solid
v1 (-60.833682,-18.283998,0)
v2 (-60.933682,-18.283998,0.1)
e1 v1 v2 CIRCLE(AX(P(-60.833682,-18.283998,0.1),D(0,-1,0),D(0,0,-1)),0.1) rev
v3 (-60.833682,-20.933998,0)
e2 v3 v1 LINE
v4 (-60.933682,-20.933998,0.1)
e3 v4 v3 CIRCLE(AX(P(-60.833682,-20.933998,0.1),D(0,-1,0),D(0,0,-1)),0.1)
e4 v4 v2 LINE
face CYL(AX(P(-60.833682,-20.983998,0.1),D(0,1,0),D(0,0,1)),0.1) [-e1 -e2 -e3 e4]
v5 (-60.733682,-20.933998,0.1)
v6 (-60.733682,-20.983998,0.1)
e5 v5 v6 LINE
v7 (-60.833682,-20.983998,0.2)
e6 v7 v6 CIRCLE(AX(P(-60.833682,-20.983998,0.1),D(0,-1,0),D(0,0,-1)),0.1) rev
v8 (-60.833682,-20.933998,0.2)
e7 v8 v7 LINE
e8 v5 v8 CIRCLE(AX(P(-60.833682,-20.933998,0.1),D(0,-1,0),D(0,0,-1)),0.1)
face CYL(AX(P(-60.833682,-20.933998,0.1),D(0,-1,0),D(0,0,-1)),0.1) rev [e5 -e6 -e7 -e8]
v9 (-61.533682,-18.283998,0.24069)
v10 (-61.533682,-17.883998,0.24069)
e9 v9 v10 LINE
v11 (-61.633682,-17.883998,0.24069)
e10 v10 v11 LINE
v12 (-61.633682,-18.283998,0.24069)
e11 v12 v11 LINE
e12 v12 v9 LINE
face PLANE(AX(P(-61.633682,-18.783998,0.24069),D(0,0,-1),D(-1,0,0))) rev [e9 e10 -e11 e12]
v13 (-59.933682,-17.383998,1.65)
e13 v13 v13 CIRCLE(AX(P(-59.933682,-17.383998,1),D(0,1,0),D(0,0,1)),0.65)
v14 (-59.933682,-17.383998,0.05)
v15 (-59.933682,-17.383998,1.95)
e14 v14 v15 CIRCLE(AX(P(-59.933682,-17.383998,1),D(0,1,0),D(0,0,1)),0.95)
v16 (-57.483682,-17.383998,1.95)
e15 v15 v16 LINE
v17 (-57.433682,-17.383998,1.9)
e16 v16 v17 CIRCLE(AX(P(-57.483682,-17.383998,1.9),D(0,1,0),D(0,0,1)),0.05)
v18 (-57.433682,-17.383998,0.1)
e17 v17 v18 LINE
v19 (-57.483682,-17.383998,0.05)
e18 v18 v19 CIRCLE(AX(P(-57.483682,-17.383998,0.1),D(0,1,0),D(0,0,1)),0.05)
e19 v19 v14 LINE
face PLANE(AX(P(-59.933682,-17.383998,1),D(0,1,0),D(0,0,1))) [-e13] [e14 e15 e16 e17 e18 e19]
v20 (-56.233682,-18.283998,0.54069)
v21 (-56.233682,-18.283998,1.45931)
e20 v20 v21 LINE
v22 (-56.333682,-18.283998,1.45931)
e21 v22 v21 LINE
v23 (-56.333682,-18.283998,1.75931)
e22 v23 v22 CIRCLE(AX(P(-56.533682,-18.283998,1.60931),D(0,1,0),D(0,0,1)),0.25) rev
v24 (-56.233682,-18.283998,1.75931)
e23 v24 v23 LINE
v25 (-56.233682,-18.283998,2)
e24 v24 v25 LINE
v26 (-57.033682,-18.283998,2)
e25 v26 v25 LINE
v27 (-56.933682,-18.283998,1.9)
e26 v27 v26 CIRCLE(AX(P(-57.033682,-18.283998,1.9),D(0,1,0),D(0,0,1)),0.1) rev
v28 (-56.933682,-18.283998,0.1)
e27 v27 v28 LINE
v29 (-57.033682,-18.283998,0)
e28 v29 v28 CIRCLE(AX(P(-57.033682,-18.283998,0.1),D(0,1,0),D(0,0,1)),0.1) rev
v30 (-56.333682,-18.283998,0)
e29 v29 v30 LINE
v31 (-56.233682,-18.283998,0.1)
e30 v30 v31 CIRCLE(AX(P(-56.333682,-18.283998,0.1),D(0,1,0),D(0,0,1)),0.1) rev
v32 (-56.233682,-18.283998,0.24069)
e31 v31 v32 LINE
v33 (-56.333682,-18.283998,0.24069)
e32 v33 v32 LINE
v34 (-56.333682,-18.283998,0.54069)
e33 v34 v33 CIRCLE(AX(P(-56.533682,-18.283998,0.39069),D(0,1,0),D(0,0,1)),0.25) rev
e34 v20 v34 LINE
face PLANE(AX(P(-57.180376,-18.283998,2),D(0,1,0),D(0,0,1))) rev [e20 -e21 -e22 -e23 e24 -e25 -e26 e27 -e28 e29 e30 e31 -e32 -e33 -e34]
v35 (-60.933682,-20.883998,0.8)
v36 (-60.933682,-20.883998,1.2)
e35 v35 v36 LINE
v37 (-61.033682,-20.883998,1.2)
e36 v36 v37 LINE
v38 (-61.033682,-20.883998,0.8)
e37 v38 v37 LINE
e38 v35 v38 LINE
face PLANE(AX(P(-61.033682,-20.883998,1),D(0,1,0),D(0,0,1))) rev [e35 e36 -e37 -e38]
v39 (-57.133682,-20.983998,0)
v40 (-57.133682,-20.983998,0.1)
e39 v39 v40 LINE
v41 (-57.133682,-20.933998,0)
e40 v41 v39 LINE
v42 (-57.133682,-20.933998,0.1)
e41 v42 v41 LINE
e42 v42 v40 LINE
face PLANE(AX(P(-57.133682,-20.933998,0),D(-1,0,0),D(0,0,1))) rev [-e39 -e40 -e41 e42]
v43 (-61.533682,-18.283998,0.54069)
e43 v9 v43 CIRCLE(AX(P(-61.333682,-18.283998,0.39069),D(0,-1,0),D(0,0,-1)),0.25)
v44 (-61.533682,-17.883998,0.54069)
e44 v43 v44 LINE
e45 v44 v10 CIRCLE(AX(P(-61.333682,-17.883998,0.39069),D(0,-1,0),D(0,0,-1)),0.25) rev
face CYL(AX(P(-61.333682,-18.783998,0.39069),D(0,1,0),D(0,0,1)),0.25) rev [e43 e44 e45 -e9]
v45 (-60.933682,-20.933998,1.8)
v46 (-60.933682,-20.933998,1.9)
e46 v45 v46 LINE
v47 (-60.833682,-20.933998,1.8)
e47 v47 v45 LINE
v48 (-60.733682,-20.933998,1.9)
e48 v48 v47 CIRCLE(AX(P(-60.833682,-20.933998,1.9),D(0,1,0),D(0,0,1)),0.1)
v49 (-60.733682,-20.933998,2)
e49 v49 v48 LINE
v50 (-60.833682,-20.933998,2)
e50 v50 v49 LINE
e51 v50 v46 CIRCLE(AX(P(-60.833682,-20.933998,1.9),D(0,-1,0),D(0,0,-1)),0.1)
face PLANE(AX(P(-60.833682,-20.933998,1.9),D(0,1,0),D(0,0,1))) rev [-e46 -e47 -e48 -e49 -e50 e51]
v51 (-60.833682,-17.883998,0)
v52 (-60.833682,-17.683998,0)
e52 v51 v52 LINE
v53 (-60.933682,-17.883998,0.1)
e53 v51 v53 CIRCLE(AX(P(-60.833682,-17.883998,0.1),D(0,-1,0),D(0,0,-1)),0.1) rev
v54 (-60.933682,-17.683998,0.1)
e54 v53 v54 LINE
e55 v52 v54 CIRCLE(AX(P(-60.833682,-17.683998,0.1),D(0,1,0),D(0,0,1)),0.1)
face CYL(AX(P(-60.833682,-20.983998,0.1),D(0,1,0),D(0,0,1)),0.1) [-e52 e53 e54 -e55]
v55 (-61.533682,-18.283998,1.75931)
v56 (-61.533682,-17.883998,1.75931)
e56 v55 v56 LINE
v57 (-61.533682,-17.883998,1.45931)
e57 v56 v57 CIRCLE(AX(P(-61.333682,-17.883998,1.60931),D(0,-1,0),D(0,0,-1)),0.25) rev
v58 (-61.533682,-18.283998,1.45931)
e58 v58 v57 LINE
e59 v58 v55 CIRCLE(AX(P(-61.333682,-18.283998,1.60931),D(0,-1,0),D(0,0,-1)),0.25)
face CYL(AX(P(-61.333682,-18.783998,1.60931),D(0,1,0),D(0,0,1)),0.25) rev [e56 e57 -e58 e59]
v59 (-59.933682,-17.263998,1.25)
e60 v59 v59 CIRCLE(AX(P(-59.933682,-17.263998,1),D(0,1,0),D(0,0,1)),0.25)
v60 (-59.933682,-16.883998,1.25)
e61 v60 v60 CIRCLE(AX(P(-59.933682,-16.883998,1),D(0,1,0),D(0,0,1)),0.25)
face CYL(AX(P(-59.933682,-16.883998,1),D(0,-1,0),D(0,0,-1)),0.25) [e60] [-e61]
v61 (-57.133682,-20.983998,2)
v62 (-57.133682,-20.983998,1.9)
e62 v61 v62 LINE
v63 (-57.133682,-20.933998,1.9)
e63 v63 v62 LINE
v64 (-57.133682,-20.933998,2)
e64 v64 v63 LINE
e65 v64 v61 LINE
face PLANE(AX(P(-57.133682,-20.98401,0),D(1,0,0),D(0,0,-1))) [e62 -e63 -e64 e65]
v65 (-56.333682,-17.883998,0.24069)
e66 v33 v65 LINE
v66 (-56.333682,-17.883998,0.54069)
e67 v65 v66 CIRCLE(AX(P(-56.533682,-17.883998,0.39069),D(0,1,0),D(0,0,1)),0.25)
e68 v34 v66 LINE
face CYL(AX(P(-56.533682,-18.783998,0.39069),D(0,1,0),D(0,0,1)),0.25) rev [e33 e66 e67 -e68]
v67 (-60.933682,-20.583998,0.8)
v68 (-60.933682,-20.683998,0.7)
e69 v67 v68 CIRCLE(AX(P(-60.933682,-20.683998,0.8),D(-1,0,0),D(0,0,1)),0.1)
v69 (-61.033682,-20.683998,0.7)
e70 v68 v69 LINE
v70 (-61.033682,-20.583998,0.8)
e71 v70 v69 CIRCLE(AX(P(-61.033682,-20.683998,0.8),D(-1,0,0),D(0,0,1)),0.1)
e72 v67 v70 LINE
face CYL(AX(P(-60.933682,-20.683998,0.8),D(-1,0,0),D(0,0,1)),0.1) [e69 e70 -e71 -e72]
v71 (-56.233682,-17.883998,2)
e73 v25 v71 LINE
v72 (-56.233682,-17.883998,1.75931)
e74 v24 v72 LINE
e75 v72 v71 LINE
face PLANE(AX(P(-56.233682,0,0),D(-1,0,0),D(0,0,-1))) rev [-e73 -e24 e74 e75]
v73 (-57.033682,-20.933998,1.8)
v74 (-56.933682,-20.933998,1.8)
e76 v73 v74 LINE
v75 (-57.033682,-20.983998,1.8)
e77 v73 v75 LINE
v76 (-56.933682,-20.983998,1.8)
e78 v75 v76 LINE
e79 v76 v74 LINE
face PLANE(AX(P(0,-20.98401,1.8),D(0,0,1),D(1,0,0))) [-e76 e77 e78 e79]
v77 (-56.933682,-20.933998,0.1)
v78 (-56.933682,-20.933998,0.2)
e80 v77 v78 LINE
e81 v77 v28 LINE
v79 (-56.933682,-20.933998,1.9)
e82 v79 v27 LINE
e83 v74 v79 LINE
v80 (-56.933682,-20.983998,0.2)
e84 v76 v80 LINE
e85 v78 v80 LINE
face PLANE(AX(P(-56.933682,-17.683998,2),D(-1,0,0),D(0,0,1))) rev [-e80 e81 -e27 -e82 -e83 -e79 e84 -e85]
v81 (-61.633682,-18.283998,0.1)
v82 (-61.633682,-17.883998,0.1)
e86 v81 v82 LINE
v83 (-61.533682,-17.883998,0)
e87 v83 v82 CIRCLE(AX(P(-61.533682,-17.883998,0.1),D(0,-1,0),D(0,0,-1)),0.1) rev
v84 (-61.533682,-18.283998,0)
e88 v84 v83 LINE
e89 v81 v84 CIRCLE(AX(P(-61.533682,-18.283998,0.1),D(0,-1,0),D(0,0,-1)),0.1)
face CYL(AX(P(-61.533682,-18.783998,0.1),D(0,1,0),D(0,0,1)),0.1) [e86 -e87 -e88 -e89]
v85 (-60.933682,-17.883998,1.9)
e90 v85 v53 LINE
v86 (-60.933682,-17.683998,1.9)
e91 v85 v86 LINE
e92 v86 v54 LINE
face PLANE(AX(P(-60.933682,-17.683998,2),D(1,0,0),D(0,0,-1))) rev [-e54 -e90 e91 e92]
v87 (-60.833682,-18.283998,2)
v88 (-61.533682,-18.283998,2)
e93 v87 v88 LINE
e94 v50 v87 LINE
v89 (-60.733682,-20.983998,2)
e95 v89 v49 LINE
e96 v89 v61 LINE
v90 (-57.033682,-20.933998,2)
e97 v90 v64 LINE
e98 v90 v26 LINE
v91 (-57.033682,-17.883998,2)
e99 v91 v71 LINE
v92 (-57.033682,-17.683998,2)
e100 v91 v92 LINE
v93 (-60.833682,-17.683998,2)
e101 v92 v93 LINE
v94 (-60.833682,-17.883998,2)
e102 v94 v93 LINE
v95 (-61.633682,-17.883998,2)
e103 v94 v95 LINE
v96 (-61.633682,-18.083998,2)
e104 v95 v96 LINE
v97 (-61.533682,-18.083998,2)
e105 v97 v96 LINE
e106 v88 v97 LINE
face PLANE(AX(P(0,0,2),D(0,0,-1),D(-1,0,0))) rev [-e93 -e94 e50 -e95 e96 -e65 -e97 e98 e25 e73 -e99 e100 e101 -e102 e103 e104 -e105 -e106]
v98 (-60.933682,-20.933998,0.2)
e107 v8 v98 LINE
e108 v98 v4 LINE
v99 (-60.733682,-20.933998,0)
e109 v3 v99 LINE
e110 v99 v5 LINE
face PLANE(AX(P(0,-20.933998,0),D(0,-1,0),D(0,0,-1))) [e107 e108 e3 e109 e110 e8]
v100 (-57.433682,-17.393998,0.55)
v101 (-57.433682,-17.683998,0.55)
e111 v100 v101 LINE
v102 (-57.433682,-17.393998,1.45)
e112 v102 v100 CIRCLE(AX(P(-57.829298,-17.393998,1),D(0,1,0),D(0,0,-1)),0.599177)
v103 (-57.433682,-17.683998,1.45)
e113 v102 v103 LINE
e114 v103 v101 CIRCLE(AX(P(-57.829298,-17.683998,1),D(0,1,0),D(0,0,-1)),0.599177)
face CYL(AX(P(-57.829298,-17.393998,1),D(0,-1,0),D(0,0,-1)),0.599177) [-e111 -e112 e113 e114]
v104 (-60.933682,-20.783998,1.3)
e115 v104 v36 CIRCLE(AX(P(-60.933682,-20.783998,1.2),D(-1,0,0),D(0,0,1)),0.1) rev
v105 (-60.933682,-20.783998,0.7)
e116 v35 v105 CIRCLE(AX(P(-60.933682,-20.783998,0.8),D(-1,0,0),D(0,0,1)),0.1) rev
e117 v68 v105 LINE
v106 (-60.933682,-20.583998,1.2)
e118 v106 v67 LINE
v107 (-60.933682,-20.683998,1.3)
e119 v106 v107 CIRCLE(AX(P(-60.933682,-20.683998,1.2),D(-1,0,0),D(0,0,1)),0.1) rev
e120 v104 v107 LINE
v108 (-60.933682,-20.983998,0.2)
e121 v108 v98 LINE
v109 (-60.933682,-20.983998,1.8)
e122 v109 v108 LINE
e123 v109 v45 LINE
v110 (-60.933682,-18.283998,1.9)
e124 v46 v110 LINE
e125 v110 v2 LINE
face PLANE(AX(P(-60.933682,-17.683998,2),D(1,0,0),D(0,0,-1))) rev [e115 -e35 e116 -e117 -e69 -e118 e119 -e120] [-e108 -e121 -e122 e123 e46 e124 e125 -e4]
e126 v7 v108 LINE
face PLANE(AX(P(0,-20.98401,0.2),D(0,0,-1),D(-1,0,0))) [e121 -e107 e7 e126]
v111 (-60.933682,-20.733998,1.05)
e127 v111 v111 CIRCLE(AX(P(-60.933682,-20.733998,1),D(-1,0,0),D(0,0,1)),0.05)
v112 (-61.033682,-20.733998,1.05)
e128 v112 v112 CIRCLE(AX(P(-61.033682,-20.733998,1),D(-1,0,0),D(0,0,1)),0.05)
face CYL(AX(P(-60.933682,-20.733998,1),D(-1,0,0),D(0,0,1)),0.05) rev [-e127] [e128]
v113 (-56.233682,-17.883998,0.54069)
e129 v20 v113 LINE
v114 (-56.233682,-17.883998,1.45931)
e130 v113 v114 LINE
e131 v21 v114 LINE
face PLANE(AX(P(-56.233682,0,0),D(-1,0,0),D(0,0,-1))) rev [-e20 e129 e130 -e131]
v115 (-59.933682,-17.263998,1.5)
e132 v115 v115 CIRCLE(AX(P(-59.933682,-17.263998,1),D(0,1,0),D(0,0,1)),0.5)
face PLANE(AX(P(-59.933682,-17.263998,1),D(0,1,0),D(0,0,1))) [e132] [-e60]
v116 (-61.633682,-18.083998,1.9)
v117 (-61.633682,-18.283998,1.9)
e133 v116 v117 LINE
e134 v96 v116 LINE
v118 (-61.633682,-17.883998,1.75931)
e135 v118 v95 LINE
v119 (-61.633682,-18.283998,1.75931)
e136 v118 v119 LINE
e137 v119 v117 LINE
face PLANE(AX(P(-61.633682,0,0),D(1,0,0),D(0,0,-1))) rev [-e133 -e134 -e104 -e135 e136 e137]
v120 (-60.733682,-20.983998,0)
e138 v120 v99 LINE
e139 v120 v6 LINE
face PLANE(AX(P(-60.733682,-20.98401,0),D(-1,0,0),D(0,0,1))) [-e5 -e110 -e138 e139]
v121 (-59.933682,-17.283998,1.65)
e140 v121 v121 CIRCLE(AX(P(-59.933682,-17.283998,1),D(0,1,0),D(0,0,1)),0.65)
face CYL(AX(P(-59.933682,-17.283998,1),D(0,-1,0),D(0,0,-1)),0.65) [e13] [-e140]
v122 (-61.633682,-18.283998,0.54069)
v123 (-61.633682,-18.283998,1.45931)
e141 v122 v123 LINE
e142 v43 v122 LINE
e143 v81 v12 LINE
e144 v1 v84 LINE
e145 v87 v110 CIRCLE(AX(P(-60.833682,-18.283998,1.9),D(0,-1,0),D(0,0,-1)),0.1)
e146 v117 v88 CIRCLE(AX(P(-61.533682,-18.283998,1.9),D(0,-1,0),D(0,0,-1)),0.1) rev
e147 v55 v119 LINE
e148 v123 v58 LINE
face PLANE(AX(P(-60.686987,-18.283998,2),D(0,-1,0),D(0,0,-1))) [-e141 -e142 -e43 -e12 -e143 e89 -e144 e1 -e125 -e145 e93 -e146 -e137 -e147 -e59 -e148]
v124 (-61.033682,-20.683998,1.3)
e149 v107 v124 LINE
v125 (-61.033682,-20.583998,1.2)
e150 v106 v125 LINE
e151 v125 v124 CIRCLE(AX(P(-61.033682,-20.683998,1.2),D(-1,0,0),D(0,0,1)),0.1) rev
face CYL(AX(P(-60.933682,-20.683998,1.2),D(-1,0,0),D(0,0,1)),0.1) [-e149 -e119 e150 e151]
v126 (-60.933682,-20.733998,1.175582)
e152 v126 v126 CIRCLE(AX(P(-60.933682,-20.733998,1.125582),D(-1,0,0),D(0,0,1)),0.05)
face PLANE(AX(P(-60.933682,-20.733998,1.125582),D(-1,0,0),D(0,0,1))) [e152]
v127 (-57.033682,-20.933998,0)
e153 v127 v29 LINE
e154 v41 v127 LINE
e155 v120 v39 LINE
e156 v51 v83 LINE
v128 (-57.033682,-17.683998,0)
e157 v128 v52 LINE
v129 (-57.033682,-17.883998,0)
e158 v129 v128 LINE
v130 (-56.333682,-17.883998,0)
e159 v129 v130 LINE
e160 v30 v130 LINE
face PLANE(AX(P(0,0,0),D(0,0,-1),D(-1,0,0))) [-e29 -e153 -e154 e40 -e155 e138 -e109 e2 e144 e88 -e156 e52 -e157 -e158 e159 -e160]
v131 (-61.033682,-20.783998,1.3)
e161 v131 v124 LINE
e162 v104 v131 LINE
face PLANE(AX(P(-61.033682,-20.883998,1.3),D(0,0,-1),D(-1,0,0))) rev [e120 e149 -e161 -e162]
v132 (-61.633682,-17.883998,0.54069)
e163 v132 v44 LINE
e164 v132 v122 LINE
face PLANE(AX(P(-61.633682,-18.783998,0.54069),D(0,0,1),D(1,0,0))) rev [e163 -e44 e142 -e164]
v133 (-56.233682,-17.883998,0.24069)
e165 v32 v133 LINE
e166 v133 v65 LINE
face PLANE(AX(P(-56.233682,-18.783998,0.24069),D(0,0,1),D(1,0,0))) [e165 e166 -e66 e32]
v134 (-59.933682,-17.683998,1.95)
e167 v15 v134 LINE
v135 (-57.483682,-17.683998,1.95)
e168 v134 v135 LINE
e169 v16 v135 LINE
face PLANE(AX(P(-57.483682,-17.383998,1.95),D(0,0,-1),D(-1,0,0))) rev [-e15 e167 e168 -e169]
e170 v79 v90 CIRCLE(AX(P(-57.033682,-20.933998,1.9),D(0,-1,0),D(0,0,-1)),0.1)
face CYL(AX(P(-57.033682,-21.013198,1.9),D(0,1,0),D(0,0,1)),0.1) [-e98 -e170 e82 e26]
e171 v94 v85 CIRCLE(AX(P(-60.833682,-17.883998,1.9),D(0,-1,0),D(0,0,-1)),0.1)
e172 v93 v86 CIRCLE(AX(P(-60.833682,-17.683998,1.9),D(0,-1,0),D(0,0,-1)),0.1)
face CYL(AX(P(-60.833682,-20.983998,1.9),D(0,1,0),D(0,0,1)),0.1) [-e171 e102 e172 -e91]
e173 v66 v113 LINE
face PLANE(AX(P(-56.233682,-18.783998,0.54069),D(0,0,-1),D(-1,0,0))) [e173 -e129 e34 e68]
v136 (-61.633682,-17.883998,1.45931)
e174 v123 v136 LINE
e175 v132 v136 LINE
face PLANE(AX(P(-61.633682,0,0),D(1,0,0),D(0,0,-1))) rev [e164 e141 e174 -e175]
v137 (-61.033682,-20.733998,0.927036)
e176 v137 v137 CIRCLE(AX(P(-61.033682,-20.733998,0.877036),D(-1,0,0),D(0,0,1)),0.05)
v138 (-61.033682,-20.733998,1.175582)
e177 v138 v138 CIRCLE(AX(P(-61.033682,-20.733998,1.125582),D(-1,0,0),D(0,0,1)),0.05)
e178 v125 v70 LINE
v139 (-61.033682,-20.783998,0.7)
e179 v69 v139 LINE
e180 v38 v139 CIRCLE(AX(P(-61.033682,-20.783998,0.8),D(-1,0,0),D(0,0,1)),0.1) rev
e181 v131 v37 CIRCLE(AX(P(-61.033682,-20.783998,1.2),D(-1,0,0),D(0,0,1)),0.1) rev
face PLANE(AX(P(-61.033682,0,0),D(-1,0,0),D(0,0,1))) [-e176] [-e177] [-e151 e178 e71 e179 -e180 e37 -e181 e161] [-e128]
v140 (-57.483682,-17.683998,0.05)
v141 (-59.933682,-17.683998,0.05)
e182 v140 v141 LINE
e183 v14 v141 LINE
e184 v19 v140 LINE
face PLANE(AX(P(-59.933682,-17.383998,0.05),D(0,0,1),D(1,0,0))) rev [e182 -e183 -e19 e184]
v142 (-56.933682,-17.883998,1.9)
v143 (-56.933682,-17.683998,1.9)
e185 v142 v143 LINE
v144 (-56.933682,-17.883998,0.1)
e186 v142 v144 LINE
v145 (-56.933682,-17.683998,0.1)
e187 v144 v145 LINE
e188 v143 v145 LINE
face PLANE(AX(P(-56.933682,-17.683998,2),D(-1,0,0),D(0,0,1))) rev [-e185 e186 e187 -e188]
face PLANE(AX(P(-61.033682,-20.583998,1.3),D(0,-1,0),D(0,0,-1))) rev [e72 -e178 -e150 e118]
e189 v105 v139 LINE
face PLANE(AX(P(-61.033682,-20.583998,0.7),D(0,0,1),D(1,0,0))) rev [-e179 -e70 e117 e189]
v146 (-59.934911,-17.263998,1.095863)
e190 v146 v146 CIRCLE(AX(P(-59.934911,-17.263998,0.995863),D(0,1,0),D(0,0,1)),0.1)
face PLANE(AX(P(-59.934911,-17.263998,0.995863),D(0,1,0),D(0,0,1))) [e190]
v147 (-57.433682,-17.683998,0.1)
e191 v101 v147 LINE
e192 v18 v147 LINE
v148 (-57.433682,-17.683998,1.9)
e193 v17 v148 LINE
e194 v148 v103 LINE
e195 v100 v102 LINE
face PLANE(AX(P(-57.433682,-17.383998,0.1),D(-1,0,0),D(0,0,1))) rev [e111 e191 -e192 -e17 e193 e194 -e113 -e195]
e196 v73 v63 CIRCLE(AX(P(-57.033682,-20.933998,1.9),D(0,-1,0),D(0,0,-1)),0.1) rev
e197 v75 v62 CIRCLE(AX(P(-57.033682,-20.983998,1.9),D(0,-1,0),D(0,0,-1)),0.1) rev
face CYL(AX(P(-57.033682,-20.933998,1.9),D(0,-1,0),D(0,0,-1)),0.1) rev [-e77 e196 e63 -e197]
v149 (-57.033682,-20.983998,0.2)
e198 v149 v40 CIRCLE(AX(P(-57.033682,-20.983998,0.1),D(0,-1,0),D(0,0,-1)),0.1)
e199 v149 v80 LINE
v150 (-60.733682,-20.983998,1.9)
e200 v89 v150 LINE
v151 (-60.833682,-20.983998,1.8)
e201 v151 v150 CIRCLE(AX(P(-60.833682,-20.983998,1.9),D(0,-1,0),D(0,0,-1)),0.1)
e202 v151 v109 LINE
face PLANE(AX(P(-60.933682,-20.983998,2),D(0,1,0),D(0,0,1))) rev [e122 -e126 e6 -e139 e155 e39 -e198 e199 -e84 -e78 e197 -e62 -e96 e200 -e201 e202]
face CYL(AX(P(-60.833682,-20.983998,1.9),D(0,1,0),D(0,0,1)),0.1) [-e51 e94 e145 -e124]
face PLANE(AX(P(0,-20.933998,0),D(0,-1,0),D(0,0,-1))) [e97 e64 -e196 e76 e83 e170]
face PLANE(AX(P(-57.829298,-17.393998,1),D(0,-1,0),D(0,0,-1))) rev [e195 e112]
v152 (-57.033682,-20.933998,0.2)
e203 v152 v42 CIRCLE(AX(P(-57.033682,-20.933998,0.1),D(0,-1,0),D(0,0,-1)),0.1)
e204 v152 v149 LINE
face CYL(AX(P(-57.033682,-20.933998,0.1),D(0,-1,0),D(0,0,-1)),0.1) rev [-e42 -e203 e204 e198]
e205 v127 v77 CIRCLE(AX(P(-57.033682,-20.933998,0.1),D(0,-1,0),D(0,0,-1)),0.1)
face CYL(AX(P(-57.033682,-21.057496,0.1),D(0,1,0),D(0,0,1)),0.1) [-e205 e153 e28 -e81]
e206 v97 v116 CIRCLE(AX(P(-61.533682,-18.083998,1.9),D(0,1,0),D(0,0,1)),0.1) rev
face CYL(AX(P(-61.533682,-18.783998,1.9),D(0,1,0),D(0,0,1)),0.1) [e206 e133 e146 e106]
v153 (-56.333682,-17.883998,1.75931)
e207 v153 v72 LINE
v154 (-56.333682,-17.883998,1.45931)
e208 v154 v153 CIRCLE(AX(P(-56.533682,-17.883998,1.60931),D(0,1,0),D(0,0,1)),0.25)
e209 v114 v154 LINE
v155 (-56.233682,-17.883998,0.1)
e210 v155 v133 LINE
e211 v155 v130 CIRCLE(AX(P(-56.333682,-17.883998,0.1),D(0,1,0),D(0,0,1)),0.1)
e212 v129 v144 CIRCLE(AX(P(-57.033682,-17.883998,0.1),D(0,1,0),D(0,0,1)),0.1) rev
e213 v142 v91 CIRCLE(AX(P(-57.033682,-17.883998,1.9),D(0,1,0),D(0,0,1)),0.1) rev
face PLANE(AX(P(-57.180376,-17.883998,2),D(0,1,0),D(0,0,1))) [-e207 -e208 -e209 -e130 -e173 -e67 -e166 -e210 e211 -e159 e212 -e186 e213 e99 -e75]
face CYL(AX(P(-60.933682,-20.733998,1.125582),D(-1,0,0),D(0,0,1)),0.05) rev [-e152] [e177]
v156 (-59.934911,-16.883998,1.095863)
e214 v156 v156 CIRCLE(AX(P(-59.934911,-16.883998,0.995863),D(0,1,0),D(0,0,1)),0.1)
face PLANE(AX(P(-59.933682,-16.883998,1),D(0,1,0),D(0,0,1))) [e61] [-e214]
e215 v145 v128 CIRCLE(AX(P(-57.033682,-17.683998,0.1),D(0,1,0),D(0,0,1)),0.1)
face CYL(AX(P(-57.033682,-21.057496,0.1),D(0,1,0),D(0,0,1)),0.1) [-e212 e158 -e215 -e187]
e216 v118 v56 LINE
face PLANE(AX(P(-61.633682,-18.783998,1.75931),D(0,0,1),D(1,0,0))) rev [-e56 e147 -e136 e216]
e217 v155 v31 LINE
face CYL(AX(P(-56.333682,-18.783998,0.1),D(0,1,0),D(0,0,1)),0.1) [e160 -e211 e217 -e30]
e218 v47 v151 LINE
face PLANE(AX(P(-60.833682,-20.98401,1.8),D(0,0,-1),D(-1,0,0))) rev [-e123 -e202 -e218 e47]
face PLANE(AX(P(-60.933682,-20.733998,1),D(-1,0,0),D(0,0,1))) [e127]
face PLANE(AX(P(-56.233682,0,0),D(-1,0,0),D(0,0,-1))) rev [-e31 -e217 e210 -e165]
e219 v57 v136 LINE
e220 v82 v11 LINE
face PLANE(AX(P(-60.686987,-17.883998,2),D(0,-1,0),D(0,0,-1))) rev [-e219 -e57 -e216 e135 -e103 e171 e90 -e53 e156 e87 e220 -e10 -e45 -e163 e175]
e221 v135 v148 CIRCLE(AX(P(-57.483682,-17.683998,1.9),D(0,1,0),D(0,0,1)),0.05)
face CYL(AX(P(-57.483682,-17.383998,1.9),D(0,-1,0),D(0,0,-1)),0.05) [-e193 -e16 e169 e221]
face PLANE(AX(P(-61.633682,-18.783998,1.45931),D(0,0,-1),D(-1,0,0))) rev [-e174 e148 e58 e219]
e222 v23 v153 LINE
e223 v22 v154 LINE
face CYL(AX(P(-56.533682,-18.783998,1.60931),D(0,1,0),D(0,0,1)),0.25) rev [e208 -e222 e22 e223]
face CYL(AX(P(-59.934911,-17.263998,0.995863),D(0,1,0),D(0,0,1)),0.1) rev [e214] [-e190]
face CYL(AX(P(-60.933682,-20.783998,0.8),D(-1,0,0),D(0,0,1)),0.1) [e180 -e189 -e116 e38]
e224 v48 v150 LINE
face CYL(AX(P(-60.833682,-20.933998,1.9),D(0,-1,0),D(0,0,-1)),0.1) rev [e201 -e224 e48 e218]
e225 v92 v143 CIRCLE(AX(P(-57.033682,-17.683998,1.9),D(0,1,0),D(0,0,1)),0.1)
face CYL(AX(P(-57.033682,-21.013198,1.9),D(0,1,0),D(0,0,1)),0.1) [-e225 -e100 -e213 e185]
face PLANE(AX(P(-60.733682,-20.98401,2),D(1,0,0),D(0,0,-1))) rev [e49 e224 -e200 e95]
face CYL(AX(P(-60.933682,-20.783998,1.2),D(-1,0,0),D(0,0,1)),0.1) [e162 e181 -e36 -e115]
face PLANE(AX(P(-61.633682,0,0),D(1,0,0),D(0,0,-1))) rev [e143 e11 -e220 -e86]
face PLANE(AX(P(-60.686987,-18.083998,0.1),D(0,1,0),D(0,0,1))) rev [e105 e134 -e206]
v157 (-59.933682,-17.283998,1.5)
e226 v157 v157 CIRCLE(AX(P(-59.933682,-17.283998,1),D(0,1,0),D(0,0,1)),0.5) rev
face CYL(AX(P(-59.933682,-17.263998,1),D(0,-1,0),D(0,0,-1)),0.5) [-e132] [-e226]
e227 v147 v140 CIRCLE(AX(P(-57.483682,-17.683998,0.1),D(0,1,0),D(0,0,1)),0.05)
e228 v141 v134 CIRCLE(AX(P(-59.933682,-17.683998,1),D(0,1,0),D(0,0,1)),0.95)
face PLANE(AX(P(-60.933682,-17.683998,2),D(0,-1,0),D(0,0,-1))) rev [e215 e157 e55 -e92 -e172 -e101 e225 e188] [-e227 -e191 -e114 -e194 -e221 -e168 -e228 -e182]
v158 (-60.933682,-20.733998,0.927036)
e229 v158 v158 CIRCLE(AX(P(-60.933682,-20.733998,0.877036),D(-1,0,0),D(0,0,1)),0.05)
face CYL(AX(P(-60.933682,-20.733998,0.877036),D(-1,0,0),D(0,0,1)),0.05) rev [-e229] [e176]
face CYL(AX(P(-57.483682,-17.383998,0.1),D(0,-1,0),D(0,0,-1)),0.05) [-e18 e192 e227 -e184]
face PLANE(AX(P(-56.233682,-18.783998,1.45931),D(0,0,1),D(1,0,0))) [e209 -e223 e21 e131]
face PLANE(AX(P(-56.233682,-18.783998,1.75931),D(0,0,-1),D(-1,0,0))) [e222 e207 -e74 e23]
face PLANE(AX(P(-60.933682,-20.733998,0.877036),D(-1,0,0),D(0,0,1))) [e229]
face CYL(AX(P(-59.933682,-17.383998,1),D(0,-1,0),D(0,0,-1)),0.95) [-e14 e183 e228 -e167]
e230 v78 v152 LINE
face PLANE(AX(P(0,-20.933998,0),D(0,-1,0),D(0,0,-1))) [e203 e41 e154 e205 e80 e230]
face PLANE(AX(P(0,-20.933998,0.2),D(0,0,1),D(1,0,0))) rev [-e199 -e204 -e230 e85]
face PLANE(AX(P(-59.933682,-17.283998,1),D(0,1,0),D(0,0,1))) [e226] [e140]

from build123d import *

# Parameters (mm, degrees)
CROQUIS1_W                  = 4
CROQUIS1_H                  = 3.3
SALIENTE_EXTRUIR2_DEPTH     = 2
CORTAR_EXTRUIR1_DEPTH       = 3.3
CORTAR_EXTRUIR2_DEPTH       = 3.3
CORTAR_EXTRUIR16_DEPTH      = 3.32919976
CORTAR_EXTRUIR17_DEPTH      = 3.373498413
SALIENTE_EXTRUIR4_DEPTH     = 0.3
SALIENTE_EXTRUIR5_DEPTH     = 0.29
CROQUIS30_R                 = 0.605268114
SALIENTE_EXTRUIR8_DEPTH     = 0.1
CROQUIS37_R                 = 0.25
SALIENTE_EXTRUIR12_DEPTH    = 0.5
CROQUIS38_R                 = 0.5
SALIENTE_EXTRUIR14_DEPTH    = 0.12
CROQUIS40_R                 = 0.65
SALIENTE_EXTRUIR15_DEPTH    = 0.1
CROQUIS41_R                 = 0.1
SALIENTE_EXTRUIR17_DEPTH    = 0.12
CROQUIS42_R                 = 0.1
CORTAR_EXTRUIR18_DEPTH      = 0.38
SALIENTE_EXTRUIR18_START    = -0.24669491
SALIENTE_EXTRUIR18_DEPTH    = 0.94669491
CORTAR_EXTRUIR20_DEPTH      = 0.7
CORTAR_EXTRUIR21_DEPTH      = 0.7
CORTAR_EXTRUIR24_DEPTH      = 0.7
SALIENTE_EXTRUIR19_DEPTH    = 0.05
SALIENTE_EXTRUIR20_DEPTH    = 0.05
SIMETR_A3_START             = -18.283997871
SIMETR_A3_DEPTH             = 0.4
SIMETR_A3_START_2           = -18.083997871
SIMETR_A3_2_DEPTH           = 0.2
CROQUIS65_W                 = 0.270146479
CROQUIS65_H                 = 0.05
CORTAR_EXTRUIR27_DEPTH      = 2.453147
SALIENTE_EXTRUIR21_DEPTH    = 0.1
CORTAR_EXTRUIR29_DEPTH      = 0.1
CROQUIS70_R                 = 0.05
CORTAR_EXTRUIR30_DEPTH      = 0.1
CORTAR_EXTRUIR33_DEPTH      = 62.802270977
CORTAR_EXTRUIR33_DEPTH_BACK = 0.05


# Read off the part's stored shape, not the designer's step: Simetría3
with BuildPart() as part:
    # Croquis1 → Saliente-Extruir2 (new body)
    with BuildSketch(Plane.XY):
        with Locations((-58.933681522, -19.333997871)):
            Rectangle(CROQUIS1_W, CROQUIS1_H)
    extrude(amount=SALIENTE_EXTRUIR2_DEPTH)

    # Croquis2 → Cortar-Extruir1 (cut)
    with BuildSketch(Plane(origin=(0, -17.683997871, 0), x_dir=(1, 0, 0), z_dir=(0, 1, 0))):
        with BuildLine():
            Line((-60.933681522, 0), (-60.933681522, -0.1))
            ThreePointArc((-60.933681522, -0.1), (-60.9043922, -0.029289322), (-60.833681522, 0))
            Line((-60.833681522, 0), (-60.933681522, 0))
        make_face()
    extrude(amount=-CORTAR_EXTRUIR1_DEPTH, mode=Mode.SUBTRACT)

    # Croquis3 → Cortar-Extruir2 (cut)
    with BuildSketch(Plane(origin=(0, -17.683997871, 0), x_dir=(1, 0, 0), z_dir=(0, 1, 0))):
        with BuildLine():
            Line((-60.933681522, -2), (-60.933681522, -1.9))
            ThreePointArc((-60.933681522, -1.9), (-60.9043922, -1.970710678), (-60.833681522, -2))
            Line((-60.833681522, -2), (-60.933681522, -2))
        make_face()
    extrude(amount=-CORTAR_EXTRUIR2_DEPTH, mode=Mode.SUBTRACT)

    # Croquis14 → Cortar-Extruir16 (cut)
    with BuildSketch(Plane(origin=(0, -17.683997871, 0), x_dir=(1, 0, 0), z_dir=(0, 1, 0))):
        with BuildLine():
            Line((-57.033681522, -2), (-56.933681522, -2))
            Line((-56.933681522, -2), (-56.933681522, -1.9))
            ThreePointArc((-56.933681522, -1.9), (-56.962970843, -1.970710678), (-57.033681522, -2))
        make_face()
    extrude(amount=-CORTAR_EXTRUIR16_DEPTH, mode=Mode.SUBTRACT)

    # Croquis20 → Cortar-Extruir17 (cut)
    with BuildSketch(Plane(origin=(0, -17.683997871, 0), x_dir=(1, 0, 0), z_dir=(0, 1, 0))):
        with BuildLine():
            Line((-56.933681522, -0.1), (-56.933681522, 0))
            Line((-56.933681522, 0), (-57.033681522, 0))
            ThreePointArc((-57.033681522, 0), (-56.962970843, -0.029289322), (-56.933681522, -0.1))
        make_face()
    extrude(amount=-CORTAR_EXTRUIR17_DEPTH, mode=Mode.SUBTRACT)

    # Croquis22 → Saliente-Extruir4 (add)
    with BuildSketch(Plane(origin=(0, -17.683997871, 0), x_dir=(1, 0, 0), z_dir=(0, 1, 0))):
        with BuildLine():
            Line((-59.933681522, -0.05), (-57.483681522, -0.05))
            ThreePointArc((-57.483681522, -0.05), (-57.448326183, -0.064644661), (-57.433681522, -0.1))
            Line((-57.433681522, -0.1), (-57.433681522, -1.9))
            ThreePointArc((-57.433681522, -1.9), (-57.448326183, -1.935355339), (-57.483681522, -1.95))
            Line((-57.483681522, -1.95), (-59.933681522, -1.95))
            ThreePointArc((-59.933681522, -1.95), (-60.883681522, -1), (-59.933681522, -0.05))
        make_face()
    extrude(amount=SALIENTE_EXTRUIR4_DEPTH)

    # Croquis29 → Saliente-Extruir5 (add)
    with BuildSketch(Plane(origin=(0, -17.683997871, 0), x_dir=(1, 0, 0), z_dir=(0, 1, 0))):
        with BuildLine():
            Line((-57.433681522, -1.45), (-57.433681522, -0.55))
            ThreePointArc((-57.433681522, -0.55), (-57.230121698, -1), (-57.433681522, -1.45))
        make_face()
    extrude(amount=SALIENTE_EXTRUIR5_DEPTH)

    # Croquis30 → Saliente-Extruir8 (add)
    with BuildSketch(Plane(origin=(0, -17.383997871, 0), x_dir=(1, 0, 0), z_dir=(0, 1, 0))):
        with Locations(Location((-59.933681522, -1, 0), (0, 0, 270))):
            Circle(CROQUIS30_R)
    extrude(amount=SALIENTE_EXTRUIR8_DEPTH)

    # Croquis37 → Saliente-Extruir12 (add)
    with BuildSketch(Plane(origin=(0, -17.383997871, 0), x_dir=(1, 0, 0), z_dir=(0, 1, 0))):
        with Locations(Location((-59.933681522, -1, 0), (0, 0, 270))):
            Circle(CROQUIS37_R)
    extrude(amount=SALIENTE_EXTRUIR12_DEPTH)

    # Croquis38 → Saliente-Extruir14 (add)
    with BuildSketch(Plane(origin=(0, -17.383997871, 0), x_dir=(1, 0, 0), z_dir=(0, 1, 0))):
        with Locations(Location((-59.933681522, -1, 0), (0, 0, 270))):
            Circle(CROQUIS38_R)
    extrude(amount=SALIENTE_EXTRUIR14_DEPTH)

    # Croquis40 → Saliente-Extruir15 (add)
    with BuildSketch(Plane(origin=(0, -17.383997871, 0), x_dir=(1, 0, 0), z_dir=(0, 1, 0))):
        with Locations(Location((-59.933681522, -1, 0), (0, 0, 270))):
            Circle(CROQUIS40_R)
    extrude(amount=SALIENTE_EXTRUIR15_DEPTH)

    # Croquis41 → Saliente-Extruir17 (add)
    with BuildSketch(Plane(origin=(0, -17.383997871, 0), x_dir=(1, 0, 0), z_dir=(0, 1, 0))):
        with Locations((-59.933681522, -1)):
            Circle(CROQUIS41_R)
    extrude(amount=SALIENTE_EXTRUIR17_DEPTH)

    # Croquis42 → Cortar-Extruir18 (cut)
    with BuildSketch(Plane(origin=(0, -16.883997871, 0), x_dir=(1, 0, 0), z_dir=(0, 1, 0))):
        with Locations(Location((-59.934910889, -0.995862689, 0), (0, 0, 270))):
            Circle(CROQUIS42_R)
    extrude(amount=-CORTAR_EXTRUIR18_DEPTH, mode=Mode.SUBTRACT)

    # Croquis44 → Saliente-Extruir18 (add)
    with BuildSketch(Plane.ZY.offset(60.933681522).offset(SALIENTE_EXTRUIR18_START)):
        Polygon((0.1, -18.083997871), (2, -18.083997871), (2, -18.283997871), (0, -18.283997871), (0, -18.083997871), align=None)
    extrude(amount=SALIENTE_EXTRUIR18_DEPTH)

    # Croquis48 → Cortar-Extruir20 (cut)
    with BuildSketch(Plane(origin=(0, -18.083997871, 0), x_dir=(1, 0, 0), z_dir=(0, 1, 0))):
        with BuildLine():
            Line((-61.633681522, -2), (-61.533681522, -2))
            ThreePointArc((-61.533681522, -2), (-61.6043922, -1.970710678), (-61.633681522, -1.9))
            Line((-61.633681522, -1.9), (-61.633681522, -2))
        make_face()
    extrude(amount=-CORTAR_EXTRUIR20_DEPTH, mode=Mode.SUBTRACT)

    # Croquis49 → Cortar-Extruir21 (cut)
    with BuildSketch(Plane(origin=(0, -18.083997871, 0), x_dir=(1, 0, 0), z_dir=(0, 1, 0))):
        with BuildLine():
            Line((-61.633681522, 0), (-61.633681522, -0.1))
            ThreePointArc((-61.633681522, -0.1), (-61.6043922, -0.029289322), (-61.533681522, 0))
            Line((-61.533681522, 0), (-61.633681522, 0))
        make_face()
    extrude(amount=-CORTAR_EXTRUIR21_DEPTH, mode=Mode.SUBTRACT)

    # Croquis50 → Cortar-Extruir24 (cut)
    with BuildSketch(Plane(origin=(0, -18.083997871, 0), x_dir=(1, 0, 0), z_dir=(0, 1, 0))):
        with BuildLine():
            Line((-61.633681522, -0.240689564), (-61.533681522, -0.240689564))
            ThreePointArc((-61.533681522, -0.240689564), (-61.083681522, -0.390689564), (-61.533681522, -0.540689564))
            Line((-61.533681522, -0.540689564), (-61.633681522, -0.540689564))
            Line((-61.633681522, -0.540689564), (-61.633681522, -0.240689564))
        make_face()
        with BuildLine():
            Line((-61.633681522, -1.459310436), (-61.533681522, -1.459310436))
            ThreePointArc((-61.533681522, -1.459310436), (-61.083681522, -1.609310436), (-61.533681522, -1.759310436))
            Line((-61.533681522, -1.759310436), (-61.633681522, -1.759310436))
            Line((-61.633681522, -1.759310436), (-61.633681522, -1.459310436))
        make_face()
    extrude(amount=-CORTAR_EXTRUIR24_DEPTH, mode=Mode.SUBTRACT)

    # Croquis54 → Saliente-Extruir19 (add)
    with BuildSketch(Plane(origin=(0, -18.083997871, 0), x_dir=(1, 0, 0), z_dir=(0, 1, 0))):
        with BuildLine():
            Line((-60.933681522, -1), (-60.933681522, -0.95))
            Line((-60.933681522, -0.95), (-61.223681522, -0.95))
            ThreePointArc((-61.223681522, -0.95), (-61.230752589, -0.952928932), (-61.233681522, -0.96))
            Line((-61.233681522, -0.96), (-61.233681522, -1.04))
            ThreePointArc((-61.233681522, -1.04), (-61.230752589, -1.047071068), (-61.223681522, -1.05))
            Line((-61.223681522, -1.05), (-60.933681522, -1.05))
            Line((-60.933681522, -1.05), (-60.933681522, -1))
        make_face()
    extrude(amount=SALIENTE_EXTRUIR19_DEPTH)

    # Croquis59 → Saliente-Extruir20 (add)
    with BuildSketch(Plane(origin=(0, 0, 0), x_dir=(-1, 0, 0), z_dir=(0, 0, -1))):
        Polygon((58.933681522, -20.569428407), (58.933681522, -18.401659744), (58.933681522, -18.116282604), (58.663535043, -18.116282604), (58.663535043, -20.569428407), align=None)
    extrude(amount=SALIENTE_EXTRUIR20_DEPTH)

    # Simetría3 outline → Simetría3 (add)
    with BuildSketch(Plane(origin=(0, 0, 0), x_dir=(1, 0, 0), z_dir=(0, 1, 0)).offset(SIMETR_A3_START)):
        with BuildLine():
            Line((-56.233681522, -0.240689564), (-56.233681522, -0.1))
            ThreePointArc((-56.233681522, -0.1), (-56.262970843, -0.029289321), (-56.333681522, 0))
            Line((-56.333681522, 0), (-57.033681522, 0))
            ThreePointArc((-57.033681522, 0), (-56.962970844, -0.029289321), (-56.933681522, -0.1))
            Line((-56.933681522, -0.1), (-56.933681522, -1.9))
            ThreePointArc((-56.933681522, -1.9), (-56.962970844, -1.970710679), (-57.033681522, -2))
            Line((-57.033681522, -2), (-56.233681522, -2))
            Line((-56.233681522, -2), (-56.233681522, -1.759310436))
            Line((-56.233681522, -1.759310436), (-56.333681522, -1.759310436))
            ThreePointArc((-56.333681522, -1.759310436), (-56.783681522, -1.609310436), (-56.333681522, -1.459310436))
            Line((-56.333681522, -1.459310436), (-56.233681522, -1.459310436))
            Line((-56.233681522, -1.459310436), (-56.233681522, -0.540689564))
            Line((-56.233681522, -0.540689564), (-56.333681522, -0.540689564))
            ThreePointArc((-56.333681522, -0.540689564), (-56.783681522, -0.390689564), (-56.333681522, -0.240689564))
            Line((-56.333681522, -0.240689564), (-56.233681522, -0.240689564))
        make_face()
        with BuildLine():
            Line((-60.933681522, -1.05), (-60.933681522, -0.95))
            Line((-60.933681522, -0.95), (-61.223681522, -0.95))
            ThreePointArc((-61.223681522, -0.95), (-61.230752589, -0.952928933), (-61.233681522, -0.96))
            Line((-61.233681522, -0.96), (-61.233681522, -1.04))
            ThreePointArc((-61.233681522, -1.04), (-61.230752589, -1.047071067), (-61.223681522, -1.05))
            Line((-61.223681522, -1.05), (-60.933681522, -1.05))
        make_face()
    extrude(amount=SIMETR_A3_DEPTH)

    # Simetr_a3 2 outline → Simetr_a3 2 (add)
    with BuildSketch(Plane(origin=(0, 0, 0), x_dir=(1, 0, 0), z_dir=(0, 1, 0)).offset(SIMETR_A3_START_2)):
        with BuildLine():
            ThreePointArc((-60.933681522, -0.1), (-60.9043922, -0.029289322), (-60.833681522, 0))
            Line((-60.833681522, 0), (-61.533681522, 0))
            ThreePointArc((-61.533681522, 0), (-61.6043922, -0.029289322), (-61.633681522, -0.1))
            Line((-61.633681522, -0.1), (-61.633681522, -0.240689564))
            Line((-61.633681522, -0.240689564), (-61.533681522, -0.240689564))
            ThreePointArc((-61.533681522, -0.240689564), (-61.083681522, -0.390689564), (-61.533681522, -0.540689564))
            Line((-61.533681522, -0.540689564), (-61.633681522, -0.540689564))
            Line((-61.633681522, -0.540689564), (-61.633681522, -1.459310436))
            Line((-61.633681522, -1.459310436), (-61.533681522, -1.459310436))
            ThreePointArc((-61.533681522, -1.459310436), (-61.083681522, -1.609310436), (-61.533681522, -1.759310436))
            Line((-61.533681522, -1.759310436), (-61.633681522, -1.759310436))
            Line((-61.633681522, -1.759310436), (-61.633681522, -2))
            Line((-61.633681522, -2), (-60.833681522, -2))
            ThreePointArc((-60.833681522, -2), (-60.9043922, -1.970710678), (-60.933681522, -1.9))
            Line((-60.933681522, -1.9), (-60.933681522, -1.05))
            Line((-60.933681522, -1.05), (-61.223681522, -1.05))
            ThreePointArc((-61.223681522, -1.05), (-61.230752589, -1.047071067), (-61.233681522, -1.04))
            Line((-61.233681522, -1.04), (-61.233681522, -0.96))
            ThreePointArc((-61.233681522, -0.96), (-61.230752589, -0.952928933), (-61.223681522, -0.95))
            Line((-61.223681522, -0.95), (-60.933681522, -0.95))
            Line((-60.933681522, -0.95), (-60.933681522, -0.1))
        make_face()
    extrude(amount=SIMETR_A3_2_DEPTH)

    # Croquis65 → Cortar-Extruir27 (cut)
    with BuildSketch(Plane(origin=(0, -18.116282604, 0), x_dir=(1, 0, 0), z_dir=(0, 1, 0))):
        with Locations((-58.798608282, 0.025)):
            Rectangle(CROQUIS65_W, CROQUIS65_H)
    extrude(amount=-CORTAR_EXTRUIR27_DEPTH, mode=Mode.SUBTRACT)

    # Croquis67 → Saliente-Extruir21 (add)
    with BuildSketch(Plane.ZY.offset(60.933681522)):
        Polygon((1, -20.883997871), (1.3, -20.883997871), (1.3, -20.583997871), (0.7, -20.583997871), (0.7, -20.883997871), align=None)
    extrude(amount=SALIENTE_EXTRUIR21_DEPTH)

    # Croquis68 → Cortar-Extruir29 (cut)
    with BuildSketch(Plane.ZY.offset(61.033681522)):
        with BuildLine():
            ThreePointArc((0.7, -20.683997871), (0.729289322, -20.613287193), (0.8, -20.583997871))
            Line((0.8, -20.583997871), (0.7, -20.583997871))
            Line((0.7, -20.583997871), (0.7, -20.683997871))
        make_face()
        with BuildLine():
            ThreePointArc((0.8, -20.883997871), (0.729289322, -20.85470855), (0.7, -20.783997871))
            Line((0.7, -20.783997871), (0.7, -20.883997871))
            Line((0.7, -20.883997871), (0.8, -20.883997871))
        make_face()
        with BuildLine():
            Line((1.3, -20.883997871), (1.3, -20.783997871))
            ThreePointArc((1.3, -20.783997871), (1.270710678, -20.85470855), (1.2, -20.883997871))
            Line((1.2, -20.883997871), (1.3, -20.883997871))
        make_face()
        with BuildLine():
            Line((1.3, -20.583997871), (1.2, -20.583997871))
            ThreePointArc((1.2, -20.583997871), (1.270710678, -20.613287193), (1.3, -20.683997871))
            Line((1.3, -20.683997871), (1.3, -20.583997871))
        make_face()
    extrude(amount=-CORTAR_EXTRUIR29_DEPTH, mode=Mode.SUBTRACT)

    # Croquis70 → Cortar-Extruir30 (cut)
    with BuildSketch(Plane.ZY.offset(61.033681522)):
        with Locations((1.125582476, -20.733997871)):
            Circle(CROQUIS70_R)
        with Locations((1, -20.733997871)):
            Circle(CROQUIS70_R)
        with Locations((0.8770362, -20.733997871)):
            Circle(CROQUIS70_R)
    extrude(amount=-CORTAR_EXTRUIR30_DEPTH, mode=Mode.SUBTRACT)

    # Croquis71 → Cortar-Extruir33 (cut, two sides: drawn at the far end of the back side and taken through both)
    with BuildSketch(Plane.XZ.offset(20.983997871).offset(-CORTAR_EXTRUIR33_DEPTH_BACK)):
        with BuildLine():
            Line((-57.033681522, 2), (-57.133681522, 2))
            Line((-57.133681522, 2), (-57.133681522, 1.9))
            ThreePointArc((-57.133681522, 1.9), (-57.1043922, 1.829289322), (-57.033681522, 1.8))
            Line((-57.033681522, 1.8), (-56.933681522, 1.8))
            Line((-56.933681522, 1.8), (-56.933681522, 1.9))
            ThreePointArc((-56.933681522, 1.9), (-56.962970843, 1.970710678), (-57.033681522, 2))
        make_face()
        with BuildLine():
            Line((-57.133681522, 0.1), (-57.133681522, 0))
            Line((-57.133681522, 0), (-57.033681522, 0))
            ThreePointArc((-57.033681522, 0), (-56.962970843, 0.029289322), (-56.933681522, 0.1))
            Line((-56.933681522, 0.1), (-56.933681522, 0.2))
            Line((-56.933681522, 0.2), (-57.033681522, 0.2))
            ThreePointArc((-57.033681522, 0.2), (-57.1043922, 0.170710678), (-57.133681522, 0.1))
        make_face()
        with BuildLine():
            Line((-60.833681522, 0), (-60.733681522, 0))
            Line((-60.733681522, 0), (-60.733681522, 0.1))
            ThreePointArc((-60.733681522, 0.1), (-60.762970843, 0.170710678), (-60.833681522, 0.2))
            Line((-60.833681522, 0.2), (-60.933681522, 0.2))
            Line((-60.933681522, 0.2), (-60.933681522, 0.1))
            ThreePointArc((-60.933681522, 0.1), (-60.9043922, 0.029289322), (-60.833681522, 0))
        make_face()
        with BuildLine():
            ThreePointArc((-60.833681522, 2), (-60.9043922, 1.970710678), (-60.933681522, 1.9))
            Line((-60.933681522, 1.9), (-60.933681522, 1.8))
            Line((-60.933681522, 1.8), (-60.833681522, 1.8))
            ThreePointArc((-60.833681522, 1.8), (-60.762970843, 1.829289322), (-60.733681522, 1.9))
            Line((-60.733681522, 1.9), (-60.733681522, 2))
            Line((-60.733681522, 2), (-60.833681522, 2))
        make_face()
    extrude(amount=CORTAR_EXTRUIR33_DEPTH + CORTAR_EXTRUIR33_DEPTH_BACK, mode=Mode.SUBTRACT)


solid = part.part
